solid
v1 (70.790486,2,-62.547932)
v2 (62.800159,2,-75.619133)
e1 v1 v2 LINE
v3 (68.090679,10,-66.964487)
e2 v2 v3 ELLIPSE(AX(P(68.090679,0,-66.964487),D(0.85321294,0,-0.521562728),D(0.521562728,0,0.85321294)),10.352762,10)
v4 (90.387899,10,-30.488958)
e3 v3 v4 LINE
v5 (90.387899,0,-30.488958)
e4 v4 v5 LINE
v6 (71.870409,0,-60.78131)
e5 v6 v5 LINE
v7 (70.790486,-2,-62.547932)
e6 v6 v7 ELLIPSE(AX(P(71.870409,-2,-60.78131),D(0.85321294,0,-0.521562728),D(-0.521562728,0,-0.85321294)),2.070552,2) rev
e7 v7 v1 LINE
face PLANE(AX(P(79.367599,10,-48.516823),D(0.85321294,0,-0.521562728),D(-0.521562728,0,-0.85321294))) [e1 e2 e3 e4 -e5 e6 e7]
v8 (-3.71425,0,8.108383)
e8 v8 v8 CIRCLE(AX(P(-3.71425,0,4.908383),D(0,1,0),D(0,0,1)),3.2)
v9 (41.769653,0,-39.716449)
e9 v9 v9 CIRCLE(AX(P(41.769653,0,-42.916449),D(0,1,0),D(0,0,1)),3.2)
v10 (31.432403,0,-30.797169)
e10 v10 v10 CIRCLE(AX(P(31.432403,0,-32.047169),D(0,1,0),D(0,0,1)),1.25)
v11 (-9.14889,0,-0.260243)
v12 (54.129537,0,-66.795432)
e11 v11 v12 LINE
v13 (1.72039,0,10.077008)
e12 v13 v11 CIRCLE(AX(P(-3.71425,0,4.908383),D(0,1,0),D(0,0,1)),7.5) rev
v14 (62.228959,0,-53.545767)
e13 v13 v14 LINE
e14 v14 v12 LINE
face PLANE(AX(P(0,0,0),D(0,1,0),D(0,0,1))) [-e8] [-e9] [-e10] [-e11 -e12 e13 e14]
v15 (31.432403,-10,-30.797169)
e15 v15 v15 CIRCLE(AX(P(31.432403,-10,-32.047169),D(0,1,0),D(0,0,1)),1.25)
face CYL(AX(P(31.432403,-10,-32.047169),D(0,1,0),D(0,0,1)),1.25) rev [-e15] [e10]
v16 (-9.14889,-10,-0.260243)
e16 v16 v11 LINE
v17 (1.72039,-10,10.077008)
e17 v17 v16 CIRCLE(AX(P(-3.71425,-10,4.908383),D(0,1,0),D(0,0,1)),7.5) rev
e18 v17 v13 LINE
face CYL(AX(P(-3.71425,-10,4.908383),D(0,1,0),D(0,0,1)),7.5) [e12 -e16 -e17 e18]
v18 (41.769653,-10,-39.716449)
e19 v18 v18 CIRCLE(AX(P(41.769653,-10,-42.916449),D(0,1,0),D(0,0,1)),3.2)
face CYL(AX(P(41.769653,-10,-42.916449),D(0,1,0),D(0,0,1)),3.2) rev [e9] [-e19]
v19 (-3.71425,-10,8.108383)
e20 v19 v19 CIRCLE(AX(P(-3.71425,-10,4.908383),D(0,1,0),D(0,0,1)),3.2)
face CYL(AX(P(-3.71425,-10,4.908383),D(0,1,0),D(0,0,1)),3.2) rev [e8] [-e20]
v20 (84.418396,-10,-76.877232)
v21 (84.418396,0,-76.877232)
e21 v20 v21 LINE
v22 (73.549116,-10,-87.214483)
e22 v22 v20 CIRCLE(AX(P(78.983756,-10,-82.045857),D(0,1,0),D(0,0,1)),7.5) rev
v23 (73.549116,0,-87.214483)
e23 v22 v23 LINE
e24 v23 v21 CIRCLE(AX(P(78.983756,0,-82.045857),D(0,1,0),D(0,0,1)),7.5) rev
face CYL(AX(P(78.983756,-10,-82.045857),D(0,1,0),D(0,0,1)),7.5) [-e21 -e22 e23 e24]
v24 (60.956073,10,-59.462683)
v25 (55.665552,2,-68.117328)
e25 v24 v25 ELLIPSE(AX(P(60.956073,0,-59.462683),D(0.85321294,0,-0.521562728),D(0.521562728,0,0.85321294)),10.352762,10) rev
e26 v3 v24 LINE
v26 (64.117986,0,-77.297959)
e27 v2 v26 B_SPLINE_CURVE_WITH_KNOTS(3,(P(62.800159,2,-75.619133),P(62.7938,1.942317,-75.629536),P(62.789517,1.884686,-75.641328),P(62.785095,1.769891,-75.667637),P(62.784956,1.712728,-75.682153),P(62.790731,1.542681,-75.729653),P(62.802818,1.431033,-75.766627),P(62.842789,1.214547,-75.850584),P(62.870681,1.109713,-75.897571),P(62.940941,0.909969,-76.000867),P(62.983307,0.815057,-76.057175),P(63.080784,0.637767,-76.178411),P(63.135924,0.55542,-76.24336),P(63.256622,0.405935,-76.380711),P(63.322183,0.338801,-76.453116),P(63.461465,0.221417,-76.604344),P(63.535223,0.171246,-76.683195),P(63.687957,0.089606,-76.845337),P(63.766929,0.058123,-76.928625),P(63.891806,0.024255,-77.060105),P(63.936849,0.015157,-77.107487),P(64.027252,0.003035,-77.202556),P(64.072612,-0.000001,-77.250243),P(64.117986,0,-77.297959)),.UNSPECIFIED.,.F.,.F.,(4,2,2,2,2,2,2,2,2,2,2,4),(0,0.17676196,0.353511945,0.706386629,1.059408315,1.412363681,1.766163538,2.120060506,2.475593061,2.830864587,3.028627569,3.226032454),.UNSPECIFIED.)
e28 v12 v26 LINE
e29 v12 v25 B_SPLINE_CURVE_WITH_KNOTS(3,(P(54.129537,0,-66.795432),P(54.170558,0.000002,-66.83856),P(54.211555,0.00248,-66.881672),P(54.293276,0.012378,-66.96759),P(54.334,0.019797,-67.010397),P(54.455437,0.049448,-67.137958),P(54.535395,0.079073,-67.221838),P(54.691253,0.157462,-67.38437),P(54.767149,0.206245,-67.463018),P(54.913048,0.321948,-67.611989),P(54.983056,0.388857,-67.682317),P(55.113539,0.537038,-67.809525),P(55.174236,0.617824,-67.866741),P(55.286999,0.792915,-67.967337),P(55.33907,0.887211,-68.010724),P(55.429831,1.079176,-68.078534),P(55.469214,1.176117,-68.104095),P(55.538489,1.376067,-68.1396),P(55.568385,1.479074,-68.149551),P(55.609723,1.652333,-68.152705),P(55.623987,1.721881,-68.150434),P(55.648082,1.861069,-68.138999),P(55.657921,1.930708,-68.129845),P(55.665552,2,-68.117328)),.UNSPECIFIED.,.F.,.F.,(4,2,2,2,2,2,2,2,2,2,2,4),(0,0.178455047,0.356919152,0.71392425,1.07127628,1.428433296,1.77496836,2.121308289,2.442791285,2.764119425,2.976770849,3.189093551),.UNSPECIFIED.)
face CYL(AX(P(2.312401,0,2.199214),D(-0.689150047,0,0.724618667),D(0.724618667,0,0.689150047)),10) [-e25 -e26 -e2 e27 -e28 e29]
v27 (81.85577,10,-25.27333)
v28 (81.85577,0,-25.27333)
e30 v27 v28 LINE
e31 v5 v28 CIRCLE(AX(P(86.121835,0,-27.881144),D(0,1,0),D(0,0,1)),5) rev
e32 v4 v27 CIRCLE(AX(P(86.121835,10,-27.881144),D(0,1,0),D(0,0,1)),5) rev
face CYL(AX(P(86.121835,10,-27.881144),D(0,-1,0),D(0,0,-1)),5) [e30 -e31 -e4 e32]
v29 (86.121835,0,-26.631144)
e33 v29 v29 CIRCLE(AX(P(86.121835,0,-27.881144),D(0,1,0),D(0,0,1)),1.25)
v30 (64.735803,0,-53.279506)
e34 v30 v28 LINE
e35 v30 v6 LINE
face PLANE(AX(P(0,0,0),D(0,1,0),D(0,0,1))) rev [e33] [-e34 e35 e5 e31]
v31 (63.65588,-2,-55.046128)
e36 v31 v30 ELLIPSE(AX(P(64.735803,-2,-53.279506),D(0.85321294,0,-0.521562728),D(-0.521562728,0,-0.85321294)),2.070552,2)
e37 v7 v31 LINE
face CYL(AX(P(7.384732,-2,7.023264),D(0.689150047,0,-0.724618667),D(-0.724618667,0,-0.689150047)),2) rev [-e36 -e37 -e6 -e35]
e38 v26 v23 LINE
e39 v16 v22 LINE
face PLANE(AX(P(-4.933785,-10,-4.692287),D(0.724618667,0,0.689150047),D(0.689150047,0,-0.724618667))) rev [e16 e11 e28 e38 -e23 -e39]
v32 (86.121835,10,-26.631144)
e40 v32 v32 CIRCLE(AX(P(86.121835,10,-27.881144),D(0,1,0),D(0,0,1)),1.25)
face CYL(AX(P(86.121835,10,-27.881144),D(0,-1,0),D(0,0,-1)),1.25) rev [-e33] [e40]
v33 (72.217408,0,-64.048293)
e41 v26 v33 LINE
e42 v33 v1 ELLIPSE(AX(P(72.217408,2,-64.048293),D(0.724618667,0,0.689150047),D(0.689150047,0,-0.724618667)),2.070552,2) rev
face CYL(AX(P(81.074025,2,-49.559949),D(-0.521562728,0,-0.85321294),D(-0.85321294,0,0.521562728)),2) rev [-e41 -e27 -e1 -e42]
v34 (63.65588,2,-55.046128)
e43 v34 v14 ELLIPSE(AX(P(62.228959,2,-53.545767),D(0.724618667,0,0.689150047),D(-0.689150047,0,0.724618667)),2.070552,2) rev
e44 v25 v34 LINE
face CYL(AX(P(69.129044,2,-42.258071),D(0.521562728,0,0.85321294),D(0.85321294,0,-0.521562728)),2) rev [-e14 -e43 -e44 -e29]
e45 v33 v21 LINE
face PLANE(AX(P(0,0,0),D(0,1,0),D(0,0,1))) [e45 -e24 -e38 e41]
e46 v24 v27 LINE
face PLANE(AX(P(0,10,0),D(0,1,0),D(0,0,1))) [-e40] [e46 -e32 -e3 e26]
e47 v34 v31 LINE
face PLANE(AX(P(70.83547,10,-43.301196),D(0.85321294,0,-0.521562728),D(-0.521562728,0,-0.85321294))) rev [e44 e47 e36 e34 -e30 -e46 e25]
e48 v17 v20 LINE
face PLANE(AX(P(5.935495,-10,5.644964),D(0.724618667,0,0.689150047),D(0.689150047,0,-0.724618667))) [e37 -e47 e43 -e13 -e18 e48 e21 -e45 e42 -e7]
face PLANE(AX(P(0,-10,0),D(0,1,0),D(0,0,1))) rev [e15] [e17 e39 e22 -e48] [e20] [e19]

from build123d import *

# Parameters (mm, degrees)
SKETCH1_R           = 3.2000000000000006
SKETCH1_R_2         = 3.2000000000000037
SKETCH1_R_3         = 1.2500000000000047
BOSS_EXTRUDE1_DEPTH = 10
SKETCH1_7_R         = 1.2500000000000122
BOSS_EXTRUDE2_DEPTH = 10
FILLET1_R           = 10
FILLET2_R           = 2
FILLET3_R           = 2


with BuildPart() as part:
    # Sketch1 → Boss-Extrude1 (new body)
    with BuildSketch(Plane(origin=(0, 0, 0), x_dir=(1, 0, 0), z_dir=(0, 1, 0))):
        with BuildLine():
            Line((-9.148889755102248, 0.2602426865805545), (73.5491158361503, 87.21448278577964))
            ThreePointArc((73.5491158361503, 87.21448278577964), (84.15238119180354, 87.48049744252629), (84.41839584855015, 76.87723208687311))
            Line((84.41839584855015, 76.87723208687311), (1.7203902572976446, -10.077008012326013))
            ThreePointArc((1.7203902572976446, -10.077008012326013), (-8.882875098355584, -10.343022669072676), (-9.148889755102248, 0.2602426865805545))
        make_face()
        with Locations(Location((-3.7142497489023008, -4.908382662872731, 0), (0, 0, 270))):
            Circle(SKETCH1_R, mode=Mode.SUBTRACT)
        with Locations(Location((41.769653326286615, 42.91644939168677, 0), (0, 0, 270))):
            Circle(SKETCH1_R_2, mode=Mode.SUBTRACT)
        with Locations(Location((31.432402627380036, 32.047169379286885, 0), (0, 0, 270))):
            Circle(SKETCH1_R_3, mode=Mode.SUBTRACT)
    extrude(amount=-BOSS_EXTRUDE1_DEPTH)

    # Sketch1<7> → Boss-Extrude2 (add)
    with BuildSketch(Plane(origin=(0, 0, 0), x_dir=(1, 0, 0), z_dir=(0, 1, 0))):
        with BuildLine():
            Line((62.691064287297834, 75.79759776372697), (55.55645800762751, 68.29579330036361))
            Line((55.55645800762751, 68.2957933003636), (81.85576990080861, 25.27333022283284))
            ThreePointArc((81.85576990080861, 25.27333022283284), (88.7296482404513, 23.61507916470229), (90.38789929858186, 30.488957504344977))
            Line((90.38789929858186, 30.488957504344977), (62.69106428729781, 75.79759776372696))
        make_face()
        with Locations(Location((86.12183459969525, 27.881143863588914, 0), (0, 0, 270))):
            Circle(SKETCH1_7_R, mode=Mode.SUBTRACT)
    extrude(amount=BOSS_EXTRUDE2_DEPTH)

    # Fillet1
    fillet1_edges = [part.edges().sort_by_distance(p)[0] for p in [
        (59.12376114746267, 10, -72.04669553204529),
    ]]
    fillet(fillet1_edges, radius=FILLET1_R)

    # Fillet2
    # the kernel refuses this fillet: 2 mm, written as the material it adds along each edge
    with BuildSketch(Plane(origin=(52.94864436687145, 0, -72.56185799925024), x_dir=(-0.853212939777324, 0, 0.5215627281512133), z_dir=(0.5215627281512133, 0, 0.853212939777324))) as fillet2_piece_1_section:
        with BuildLine():
            CenterArc((FILLET2_R, -FILLET2_R), FILLET2_R, 90, 90)
            Line((-6.06e-15, -FILLET2_R), (0, 0))
            Line((0, 0), (FILLET2_R, 0))
        make_face()
    fillet2_piece_1 = extrude(amount=25.52914270615122, mode=Mode.PRIVATE)
    fillet2_piece_1 = fillet2_piece_1 & Plane(origin=(61.097194422091576, 1.78e-15, -59.61106783019719), x_dir=(-0.7246186674933254, 0, -0.6891500465937715), z_dir=(-0.6891500465937715, 0, 0.7246186674933254)) * Cylinder(10, 60, mode=Mode.PRIVATE)
    fillet2_piece_1 = split(fillet2_piece_1, bisect_by=Plane(origin=(64.72028775955818, 0.44613502682003076, -56.16531759722836), z_dir=(-0.7246186674933262, 0, -0.6891500465937709)), keep=Keep.TOP, mode=Mode.PRIVATE)
    add(fillet2_piece_1)
    with BuildSketch(Plane(origin=(73.39829996372362, 0, -58.28186756430348), x_dir=(0.853212939777324, 0, -0.5215627281512135), z_dir=(-0.5215627281512135, 0, -0.8532129397773239))) as fillet2_piece_2_section:
        with BuildLine():
            CenterArc((FILLET2_R, -FILLET2_R), FILLET2_R, 90, 90)
            Line((0, -FILLET2_R), (0, 0))
            Line((0, 0), (FILLET2_R, 0))
        make_face()
    fillet2_piece_2 = extrude(amount=25.529142706151212, mode=Mode.PRIVATE)
    fillet2_piece_2 = fillet2_piece_2 & Plane(origin=(68.86970126476385, 1.78e-15, -67.78360381021702), x_dir=(-0.7246186674933254, 0, -0.6891500465937715), z_dir=(-0.6891500465937715, 0, 0.7246186674933254)) * Cylinder(10, 60, mode=Mode.PRIVATE)
    fillet2_piece_2 = split(fillet2_piece_2, bisect_by=Plane(origin=(72.49279460223045, 0.4461350127240334, -64.3378535772482), z_dir=(-0.7246186674933262, 0, -0.6891500465937709)), keep=Keep.TOP, mode=Mode.PRIVATE)
    add(fillet2_piece_2)

    # Fillet3
    fillet3_edges = [part.edges().sort_by_distance(p)[0] for p in [
        (67.22318318313239, 0, -58.797030031508406),
    ]]
    fillet(fillet3_edges, radius=FILLET3_R)


solid = part.part
